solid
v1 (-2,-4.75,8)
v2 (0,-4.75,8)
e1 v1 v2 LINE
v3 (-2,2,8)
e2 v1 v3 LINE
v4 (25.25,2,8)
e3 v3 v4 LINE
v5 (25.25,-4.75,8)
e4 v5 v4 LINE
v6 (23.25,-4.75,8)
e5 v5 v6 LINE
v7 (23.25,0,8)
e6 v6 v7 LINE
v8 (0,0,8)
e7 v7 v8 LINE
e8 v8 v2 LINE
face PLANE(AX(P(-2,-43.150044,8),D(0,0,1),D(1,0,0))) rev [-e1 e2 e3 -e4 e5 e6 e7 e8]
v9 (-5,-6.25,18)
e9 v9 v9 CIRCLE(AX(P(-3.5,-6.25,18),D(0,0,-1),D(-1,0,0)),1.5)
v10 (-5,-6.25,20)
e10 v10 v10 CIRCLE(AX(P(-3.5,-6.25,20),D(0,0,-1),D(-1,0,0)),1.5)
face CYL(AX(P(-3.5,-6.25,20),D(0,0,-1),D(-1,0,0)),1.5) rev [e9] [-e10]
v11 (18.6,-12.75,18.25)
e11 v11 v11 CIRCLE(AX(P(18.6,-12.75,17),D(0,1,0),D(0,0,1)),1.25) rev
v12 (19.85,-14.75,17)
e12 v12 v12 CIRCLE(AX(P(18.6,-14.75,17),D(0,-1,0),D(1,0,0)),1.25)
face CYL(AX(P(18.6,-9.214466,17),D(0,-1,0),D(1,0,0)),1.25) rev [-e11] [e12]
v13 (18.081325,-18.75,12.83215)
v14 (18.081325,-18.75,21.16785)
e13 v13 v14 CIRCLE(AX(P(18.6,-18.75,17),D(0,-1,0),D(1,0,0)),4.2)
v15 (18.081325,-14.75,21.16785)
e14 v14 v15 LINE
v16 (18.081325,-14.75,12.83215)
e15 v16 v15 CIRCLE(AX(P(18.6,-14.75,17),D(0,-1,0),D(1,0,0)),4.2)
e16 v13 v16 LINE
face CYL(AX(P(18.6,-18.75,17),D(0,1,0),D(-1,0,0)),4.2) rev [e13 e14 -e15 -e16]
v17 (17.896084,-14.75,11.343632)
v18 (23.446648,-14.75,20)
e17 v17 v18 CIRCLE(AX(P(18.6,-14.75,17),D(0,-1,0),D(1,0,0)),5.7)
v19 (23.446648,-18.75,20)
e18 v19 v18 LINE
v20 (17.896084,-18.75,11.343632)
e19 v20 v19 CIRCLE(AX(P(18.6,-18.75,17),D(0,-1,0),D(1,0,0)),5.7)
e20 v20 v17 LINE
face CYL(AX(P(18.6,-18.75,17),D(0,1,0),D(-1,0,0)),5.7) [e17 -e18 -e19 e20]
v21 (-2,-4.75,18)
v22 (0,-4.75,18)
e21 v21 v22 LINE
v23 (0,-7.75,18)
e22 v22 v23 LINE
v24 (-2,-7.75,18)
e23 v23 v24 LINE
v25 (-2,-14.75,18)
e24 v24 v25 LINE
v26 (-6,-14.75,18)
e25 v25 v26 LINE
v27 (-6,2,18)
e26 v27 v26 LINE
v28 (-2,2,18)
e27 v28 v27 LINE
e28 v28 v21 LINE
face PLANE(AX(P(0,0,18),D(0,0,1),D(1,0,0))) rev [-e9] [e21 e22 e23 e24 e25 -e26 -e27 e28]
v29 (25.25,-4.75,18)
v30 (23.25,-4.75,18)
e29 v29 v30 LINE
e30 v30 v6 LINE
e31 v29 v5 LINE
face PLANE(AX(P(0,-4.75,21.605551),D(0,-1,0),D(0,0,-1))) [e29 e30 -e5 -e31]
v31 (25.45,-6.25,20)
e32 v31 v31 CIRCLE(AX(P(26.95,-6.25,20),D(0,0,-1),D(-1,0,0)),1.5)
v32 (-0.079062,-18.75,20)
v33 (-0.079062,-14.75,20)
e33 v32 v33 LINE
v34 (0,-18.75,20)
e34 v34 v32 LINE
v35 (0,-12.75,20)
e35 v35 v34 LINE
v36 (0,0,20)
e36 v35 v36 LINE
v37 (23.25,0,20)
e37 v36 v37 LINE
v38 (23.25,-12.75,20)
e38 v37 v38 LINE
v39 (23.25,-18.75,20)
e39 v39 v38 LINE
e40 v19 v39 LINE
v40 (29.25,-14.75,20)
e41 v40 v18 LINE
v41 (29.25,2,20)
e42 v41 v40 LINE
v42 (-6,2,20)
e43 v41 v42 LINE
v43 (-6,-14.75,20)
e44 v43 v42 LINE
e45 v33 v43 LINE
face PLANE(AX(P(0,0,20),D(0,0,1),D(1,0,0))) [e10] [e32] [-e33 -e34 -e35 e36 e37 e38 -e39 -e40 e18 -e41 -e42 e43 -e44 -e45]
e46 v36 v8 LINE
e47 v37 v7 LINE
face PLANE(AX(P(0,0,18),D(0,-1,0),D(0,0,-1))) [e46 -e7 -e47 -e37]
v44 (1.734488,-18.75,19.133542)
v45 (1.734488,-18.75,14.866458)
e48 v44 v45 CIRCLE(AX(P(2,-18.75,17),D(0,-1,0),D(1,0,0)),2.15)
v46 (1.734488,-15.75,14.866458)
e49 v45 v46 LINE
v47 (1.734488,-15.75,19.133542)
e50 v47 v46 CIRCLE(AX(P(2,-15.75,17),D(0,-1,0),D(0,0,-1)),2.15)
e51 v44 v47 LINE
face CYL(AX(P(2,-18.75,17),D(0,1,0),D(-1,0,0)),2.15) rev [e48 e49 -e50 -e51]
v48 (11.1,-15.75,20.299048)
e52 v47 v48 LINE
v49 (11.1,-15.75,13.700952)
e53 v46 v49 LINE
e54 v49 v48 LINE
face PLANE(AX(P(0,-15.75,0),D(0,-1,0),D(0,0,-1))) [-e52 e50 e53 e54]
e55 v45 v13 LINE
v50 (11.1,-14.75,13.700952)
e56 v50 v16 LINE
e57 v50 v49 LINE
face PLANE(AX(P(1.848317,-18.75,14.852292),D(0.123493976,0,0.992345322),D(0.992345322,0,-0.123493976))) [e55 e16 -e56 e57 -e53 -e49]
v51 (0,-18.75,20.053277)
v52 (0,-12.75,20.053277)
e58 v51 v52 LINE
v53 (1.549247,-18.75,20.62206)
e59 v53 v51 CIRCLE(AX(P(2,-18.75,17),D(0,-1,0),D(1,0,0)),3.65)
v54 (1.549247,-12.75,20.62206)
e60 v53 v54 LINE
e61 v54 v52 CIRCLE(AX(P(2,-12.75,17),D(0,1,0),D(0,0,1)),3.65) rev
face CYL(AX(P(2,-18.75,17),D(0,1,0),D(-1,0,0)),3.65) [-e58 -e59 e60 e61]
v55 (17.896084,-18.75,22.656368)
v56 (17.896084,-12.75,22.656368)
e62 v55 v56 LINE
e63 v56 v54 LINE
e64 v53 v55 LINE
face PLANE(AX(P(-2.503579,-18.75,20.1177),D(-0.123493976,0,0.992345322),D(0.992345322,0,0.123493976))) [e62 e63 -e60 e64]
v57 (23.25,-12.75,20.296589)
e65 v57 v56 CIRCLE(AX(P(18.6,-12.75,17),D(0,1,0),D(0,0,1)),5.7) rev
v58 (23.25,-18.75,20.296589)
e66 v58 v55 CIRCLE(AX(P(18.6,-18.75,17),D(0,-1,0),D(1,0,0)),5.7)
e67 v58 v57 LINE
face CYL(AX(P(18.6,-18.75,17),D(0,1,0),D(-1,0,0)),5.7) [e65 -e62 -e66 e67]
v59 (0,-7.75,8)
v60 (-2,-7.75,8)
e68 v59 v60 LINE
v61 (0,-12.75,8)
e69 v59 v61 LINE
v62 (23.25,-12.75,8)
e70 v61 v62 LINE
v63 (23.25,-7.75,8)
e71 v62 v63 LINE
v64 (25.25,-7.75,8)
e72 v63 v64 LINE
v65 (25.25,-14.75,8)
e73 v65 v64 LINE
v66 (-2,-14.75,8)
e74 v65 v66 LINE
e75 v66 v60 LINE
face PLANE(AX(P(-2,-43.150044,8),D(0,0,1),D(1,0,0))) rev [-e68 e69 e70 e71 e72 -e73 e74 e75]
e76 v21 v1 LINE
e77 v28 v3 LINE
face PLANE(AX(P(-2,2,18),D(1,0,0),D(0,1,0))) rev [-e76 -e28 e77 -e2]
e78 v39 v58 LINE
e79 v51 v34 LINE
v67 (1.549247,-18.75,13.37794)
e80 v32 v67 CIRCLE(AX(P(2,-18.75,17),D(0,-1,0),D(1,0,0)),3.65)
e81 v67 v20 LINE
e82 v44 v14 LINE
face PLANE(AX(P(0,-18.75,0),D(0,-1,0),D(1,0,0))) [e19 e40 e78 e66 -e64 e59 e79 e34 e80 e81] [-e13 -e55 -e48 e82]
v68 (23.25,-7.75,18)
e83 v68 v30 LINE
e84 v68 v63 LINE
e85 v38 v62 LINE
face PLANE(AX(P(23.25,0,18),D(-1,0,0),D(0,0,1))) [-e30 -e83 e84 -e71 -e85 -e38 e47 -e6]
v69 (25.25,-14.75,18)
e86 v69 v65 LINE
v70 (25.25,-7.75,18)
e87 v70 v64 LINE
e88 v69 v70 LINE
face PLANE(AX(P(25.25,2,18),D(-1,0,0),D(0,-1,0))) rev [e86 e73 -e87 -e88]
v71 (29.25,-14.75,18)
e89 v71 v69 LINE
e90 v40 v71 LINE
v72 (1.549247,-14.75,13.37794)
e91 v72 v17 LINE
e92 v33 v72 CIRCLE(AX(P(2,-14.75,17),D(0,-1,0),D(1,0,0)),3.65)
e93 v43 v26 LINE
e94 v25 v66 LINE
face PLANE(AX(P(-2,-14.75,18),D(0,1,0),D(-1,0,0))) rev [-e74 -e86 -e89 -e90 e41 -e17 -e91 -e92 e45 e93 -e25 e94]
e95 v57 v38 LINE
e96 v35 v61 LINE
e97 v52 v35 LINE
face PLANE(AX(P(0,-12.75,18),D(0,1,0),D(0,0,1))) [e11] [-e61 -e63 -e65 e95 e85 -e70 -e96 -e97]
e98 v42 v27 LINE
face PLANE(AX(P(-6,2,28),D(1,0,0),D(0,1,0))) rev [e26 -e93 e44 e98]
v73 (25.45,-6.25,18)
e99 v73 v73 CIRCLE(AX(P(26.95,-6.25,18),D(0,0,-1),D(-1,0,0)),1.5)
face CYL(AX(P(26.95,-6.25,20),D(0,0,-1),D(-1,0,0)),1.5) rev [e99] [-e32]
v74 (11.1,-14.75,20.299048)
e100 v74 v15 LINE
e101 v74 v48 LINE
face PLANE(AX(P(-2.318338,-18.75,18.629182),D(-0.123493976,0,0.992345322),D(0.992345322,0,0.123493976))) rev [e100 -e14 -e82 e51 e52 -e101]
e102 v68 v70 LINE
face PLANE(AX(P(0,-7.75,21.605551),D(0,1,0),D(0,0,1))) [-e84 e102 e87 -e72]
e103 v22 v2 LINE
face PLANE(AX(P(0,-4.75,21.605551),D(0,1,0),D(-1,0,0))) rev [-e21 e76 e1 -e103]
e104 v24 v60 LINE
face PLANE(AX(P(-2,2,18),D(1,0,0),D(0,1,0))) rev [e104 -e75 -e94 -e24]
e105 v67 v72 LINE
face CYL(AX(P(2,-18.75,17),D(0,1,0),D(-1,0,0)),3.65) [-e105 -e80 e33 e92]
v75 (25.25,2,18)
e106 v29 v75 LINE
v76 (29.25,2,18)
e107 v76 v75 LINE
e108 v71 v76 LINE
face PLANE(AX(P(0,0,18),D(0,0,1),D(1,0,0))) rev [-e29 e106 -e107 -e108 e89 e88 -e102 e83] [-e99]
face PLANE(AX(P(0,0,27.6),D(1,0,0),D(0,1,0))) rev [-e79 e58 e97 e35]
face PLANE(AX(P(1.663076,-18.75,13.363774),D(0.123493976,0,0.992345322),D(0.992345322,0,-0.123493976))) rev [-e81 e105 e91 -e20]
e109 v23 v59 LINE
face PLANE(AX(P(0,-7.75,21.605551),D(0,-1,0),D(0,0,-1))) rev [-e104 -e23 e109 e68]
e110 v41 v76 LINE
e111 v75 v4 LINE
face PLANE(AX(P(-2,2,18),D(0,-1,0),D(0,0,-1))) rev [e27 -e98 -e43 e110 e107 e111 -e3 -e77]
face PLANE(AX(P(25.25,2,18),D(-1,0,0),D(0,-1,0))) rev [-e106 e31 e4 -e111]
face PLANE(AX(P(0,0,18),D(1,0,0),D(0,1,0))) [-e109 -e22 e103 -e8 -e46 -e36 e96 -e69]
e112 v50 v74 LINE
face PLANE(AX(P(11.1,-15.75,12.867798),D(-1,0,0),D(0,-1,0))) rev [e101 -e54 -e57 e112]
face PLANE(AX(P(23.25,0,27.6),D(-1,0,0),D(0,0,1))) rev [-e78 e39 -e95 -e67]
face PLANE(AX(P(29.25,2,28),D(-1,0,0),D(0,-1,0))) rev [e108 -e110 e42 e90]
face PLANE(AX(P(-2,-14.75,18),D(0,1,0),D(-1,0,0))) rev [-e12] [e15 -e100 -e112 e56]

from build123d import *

# Parameters (mm, degrees)
SKETCH1_W           = 27.25
SKETCH1_H           = 16.75
SKETCH1_W_2         = 23.25
SKETCH1_H_2         = 12.75
BOSS_EXTRUDE1_DEPTH = 18
SKETCH3_W           = 23.25
SKETCH3_H           = 12.75
BOSS_EXTRUDE2_DEPTH = 2
SKETCH7_W           = 2
SKETCH7_H           = 5
CUT_EXTRUDE1_DEPTH  = 2
SKETCH10_W          = 23.25
SKETCH10_H          = 12.75
SKETCH10_W_2        = 7
SKETCH10_H_2        = 16.75
BOSS_EXTRUDE3_DEPTH = 2
SKETCH11_R          = 1.5
CUT_EXTRUDE3_DEPTH  = 2
SKETCH12_R          = 1.5
CUT_EXTRUDE4_DEPTH  = 2
FILLET11_R          = 1
SKETCH13_W          = 3
SKETCH13_H          = 16.75
CUT_EXTRUDE5_DEPTH  = 10
CUT_EXTRUDE6_REACH  = 41.193
SKETCH14_W          = 27.25
SKETCH14_H          = 8
SKETCH16_W          = 23.25
SKETCH16_H          = 2
BOSS_EXTRUDE5_DEPTH = 7.6
SKETCH19_W          = 2
SKETCH19_H          = 3
CUT_EXTRUDE8_DEPTH  = 10
BOSS_EXTRUDE6_DEPTH = 4
SKETCH21_R          = 1.25
CUT_EXTRUDE9_DEPTH  = 2
BOSS_EXTRUDE7_DEPTH = 1
CUT_EXTRUDE11_START = -12
CUT_EXTRUDE11_DEPTH = 12


with BuildPart() as part:
    # Sketch1 → Boss-Extrude1 (new body)
    with BuildSketch(Plane.XY):
        with Locations((11.625, -6.375)):
            Rectangle(SKETCH1_W, SKETCH1_H)
        with Locations((11.625, -6.375)):
            Rectangle(SKETCH1_W_2, SKETCH1_H_2, mode=Mode.SUBTRACT)
    extrude(amount=BOSS_EXTRUDE1_DEPTH)

    # Sketch3 → Boss-Extrude2 (add)
    with BuildSketch(Plane(origin=(0, 0, 0), x_dir=(-1, 0, 0), z_dir=(0, 0, -1))):
        with Locations((-11.625, -6.375)):
            Rectangle(SKETCH3_W, SKETCH3_H)
    extrude(amount=-BOSS_EXTRUDE2_DEPTH)

    # Sketch7 → Cut-Extrude1 (cut)
    with BuildSketch(Plane.ZY.offset(2)):
        with Locations((3, -6.5)):
            Rectangle(SKETCH7_W, SKETCH7_H)
    extrude(amount=-CUT_EXTRUDE1_DEPTH, mode=Mode.SUBTRACT)

    # Sketch10 → Boss-Extrude3 (add)
    # profile 1 of 3: a face of its own
    with BuildSketch(Plane.XY.offset(18)):
        Polygon((-2, -0.03961342), (-2, 2), (-9, 2), (-9, -14.75), (-2, -14.75), (-2, -13.03961342), align=None)
    # profile 2 of 3: a face of its own
    with BuildSketch(Plane.XY.offset(18)):
        Polygon((25.25, 2), (-2, 2), (-2, -0.03961342), (-2, -13.03961342), (-2, -14.75), (25.25, -14.75), align=None)
        with Locations((11.625, -6.375)):
            Rectangle(SKETCH10_W, SKETCH10_H, mode=Mode.SUBTRACT)
    # profile 3 of 3: a face of its own
    with BuildSketch(Plane.XY.offset(18)):
        with Locations((28.75, -6.375)):
            Rectangle(SKETCH10_W_2, SKETCH10_H_2)
    extrude(amount=BOSS_EXTRUDE3_DEPTH)

    # Sketch11 → Cut-Extrude3 (cut)
    with BuildSketch(Plane(origin=(0, 0, 18), x_dir=(-1, 0, 0), z_dir=(0, 0, -1))):
        with Locations((3.5, -6.25)):
            Circle(SKETCH11_R)
    extrude(amount=-CUT_EXTRUDE3_DEPTH, mode=Mode.SUBTRACT)

    # Sketch12 → Cut-Extrude4 (cut)
    with BuildSketch(Plane(origin=(0, 0, 18), x_dir=(-1, 0, 0), z_dir=(0, 0, -1))):
        with Locations((-26.95, -6.25)):
            Circle(SKETCH12_R)
    extrude(amount=-CUT_EXTRUDE4_DEPTH, mode=Mode.SUBTRACT)

    # Fillet11
    fillet11_edges = [part.edges().sort_by_distance(p)[0] for p in [
        (0, -9, 3),
        (0, -4, 3),
        (0, -6.5, 4),
        (-2, -6.5, 4),
        (-2, -4, 3),
        (-2, -9, 3),
    ]]
    fillet(fillet11_edges, radius=FILLET11_R - 0.0001)  # a hair under: the kernel refuses the full size

    # Sketch13 → Cut-Extrude5 (cut)
    with BuildSketch(Plane(origin=(0, 0, 18), x_dir=(-1, 0, 0), z_dir=(0, 0, -1))):
        with Locations((-30.75, -6.375)):
            Rectangle(SKETCH13_W, SKETCH13_H)
        with Locations((7.5, -6.375)):
            Rectangle(SKETCH13_W, SKETCH13_H)
    extrude(amount=-CUT_EXTRUDE5_DEPTH, mode=Mode.SUBTRACT)

    # Cut-Extrude6: up to this face of the body (flat: up to its plane)
    cut_extrude6_end = Plane(part.part.faces().sort_by_distance((11.625, -14.75, 10.256684492))[0])
    # Sketch14 → Cut-Extrude6 (cut, up to the picked face)
    with BuildSketch(Plane(origin=(0, 2, 0), x_dir=(1, 0, 0), z_dir=(0, 1, 0)), mode=Mode.PRIVATE) as cut_extrude6_sk1:
        with Locations((11.625, -4)):
            Rectangle(SKETCH14_W, SKETCH14_H)
    cut_extrude6_tool1 = split(extrude(cut_extrude6_sk1.sketch, amount=-CUT_EXTRUDE6_REACH, mode=Mode.PRIVATE), bisect_by=cut_extrude6_end, keep=Keep.BOTH, mode=Mode.PRIVATE)
    add(cut_extrude6_tool1.solids().sort_by(Axis((11.625, 2, 4), (0, -1, 0)))[0], mode=Mode.SUBTRACT)

    # Sketch16 → Boss-Extrude5 (add)
    with BuildSketch(Plane.XY.offset(20)):
        with Locations((11.625, -13.75)):
            Rectangle(SKETCH16_W, SKETCH16_H)
    extrude(amount=BOSS_EXTRUDE5_DEPTH)

    # Sketch19 → Cut-Extrude8 (cut)
    with BuildSketch(Plane(origin=(0, 0, 8), x_dir=(-1, 0, 0), z_dir=(0, 0, -1))):
        with Locations((1, -6.25)):
            Rectangle(SKETCH19_W, SKETCH19_H)
        with Locations((-24.25, -6.25)):
            Rectangle(SKETCH19_W, SKETCH19_H)
    extrude(amount=-CUT_EXTRUDE8_DEPTH, mode=Mode.SUBTRACT)

    # Sketch20 → Boss-Extrude6 (add)
    with BuildSketch(Plane.XZ.offset(14.75)):
        with BuildLine():
            ThreePointArc((1.734487906, 14.866457564), (-0.15, 17.000000025), (1.734487955, 19.133542442))
            Line((1.734487955, 19.133542442), (4.661486136, 19.497797339))
            ThreePointArc((4.661486136, 19.497797339), (3.240091566, 20.432881138), (1.549246975, 20.622060423))
            ThreePointArc((1.549246975, 20.622060423), (0.742054746, 20.4263791), (0, 20.053276928))
            Line((0, 20.053276928), (0, 20))
            Line((0, 20), (-0.079062289, 20))
            ThreePointArc((-0.079062289, 20), (-1.544419903, 16.128456799), (1.549246968, 13.377939578))
            ThreePointArc((1.549246968, 13.377939578), (3.240091563, 13.567118861), (4.661486136, 14.502202661))
            Line((4.661486136, 14.502202661), (1.734487906, 14.866457564))
        make_face()
        with BuildLine():
            ThreePointArc((1.549246975, 20.622060423), (3.240091566, 20.432881138), (4.661486136, 19.497797339))
            Line((4.661486136, 19.497797339), (14.257253364, 20.691957699))
            ThreePointArc((14.257253364, 20.691957699), (15.89224684, 22.015782374), (17.896084422, 22.656368345))
            Line((17.896084422, 22.656368345), (1.549246975, 20.622060423))
        make_face()
        with BuildLine():
            ThreePointArc((17.896084422, 22.656368345), (15.89224684, 22.015782374), (14.257253364, 20.691957699))
            Line((14.257253364, 20.691957699), (18.081325153, 21.167850334))
            ThreePointArc((18.081325153, 21.167850334), (21.380428532, 20.14789091), (22.8, 17))
            ThreePointArc((22.8, 17), (21.380428595, 13.852109147), (18.081325321, 12.832149645))
            Line((18.081325321, 12.832149645), (14.257253364, 13.308042301))
            ThreePointArc((14.257253364, 13.308042301), (15.89224684, 11.984217626), (17.896084422, 11.343631655))
            ThreePointArc((17.896084422, 11.343631655), (22.37343883, 12.727862432), (24.3, 17))
            ThreePointArc((24.3, 17), (24.082512903, 18.559503854), (23.446648326, 20))
            Line((23.446648326, 20), (23.25, 20))
            Line((23.25, 20), (23.25, 20.296589146))
            ThreePointArc((23.25, 20.296589146), (20.898920406, 22.215837897), (17.896084422, 22.656368345))
        make_face()
        with BuildLine():
            Line((14.257253364, 13.308042301), (4.661486136, 14.502202661))
            ThreePointArc((4.661486136, 14.502202661), (3.240091563, 13.567118861), (1.549246968, 13.377939578))
            Line((1.549246968, 13.377939578), (17.896084422, 11.343631655))
            ThreePointArc((17.896084422, 11.343631655), (15.89224684, 11.984217626), (14.257253364, 13.308042301))
        make_face()
    extrude(amount=BOSS_EXTRUDE6_DEPTH)

    # Sketch21 → Cut-Extrude9 (cut)
    with BuildSketch(Plane.XZ.offset(14.75)):
        with Locations((18.6, 17)):
            Circle(SKETCH21_R)
    extrude(amount=-CUT_EXTRUDE9_DEPTH, mode=Mode.SUBTRACT)

    # Sketch23 → Boss-Extrude7 (add)
    with BuildSketch(Plane.XZ.offset(14.75)):
        Polygon((11.1, 21.100651295), (0.406174607, 19.998863224), (-0.954500861, 17.320033397), (0.387681288, 14.425953139), (11.1, 12.86779769), align=None)
    extrude(amount=BOSS_EXTRUDE7_DEPTH)

    # Sketch24 → Cut-Extrude11 (cut)
    with BuildSketch(Plane.XZ.offset(14.75).offset(CUT_EXTRUDE11_START)):
        with BuildLine():
            ThreePointArc((0, 20.053276928), (0.742054739, 20.426379098), (1.549246961, 20.622060422))
            Line((1.549246961, 20.622060422), (17.896084422, 22.656368345))
            ThreePointArc((17.896084422, 22.656368345), (20.898920406, 22.215837897), (23.25, 20.296589146))
            Line((23.25, 20.296589146), (23.25, 27.6))
            Line((23.25, 27.6), (0, 27.6))
            Line((0, 27.6), (0, 20.053276928))
        make_face()
    extrude(amount=CUT_EXTRUDE11_DEPTH, mode=Mode.SUBTRACT)


solid = part.part
